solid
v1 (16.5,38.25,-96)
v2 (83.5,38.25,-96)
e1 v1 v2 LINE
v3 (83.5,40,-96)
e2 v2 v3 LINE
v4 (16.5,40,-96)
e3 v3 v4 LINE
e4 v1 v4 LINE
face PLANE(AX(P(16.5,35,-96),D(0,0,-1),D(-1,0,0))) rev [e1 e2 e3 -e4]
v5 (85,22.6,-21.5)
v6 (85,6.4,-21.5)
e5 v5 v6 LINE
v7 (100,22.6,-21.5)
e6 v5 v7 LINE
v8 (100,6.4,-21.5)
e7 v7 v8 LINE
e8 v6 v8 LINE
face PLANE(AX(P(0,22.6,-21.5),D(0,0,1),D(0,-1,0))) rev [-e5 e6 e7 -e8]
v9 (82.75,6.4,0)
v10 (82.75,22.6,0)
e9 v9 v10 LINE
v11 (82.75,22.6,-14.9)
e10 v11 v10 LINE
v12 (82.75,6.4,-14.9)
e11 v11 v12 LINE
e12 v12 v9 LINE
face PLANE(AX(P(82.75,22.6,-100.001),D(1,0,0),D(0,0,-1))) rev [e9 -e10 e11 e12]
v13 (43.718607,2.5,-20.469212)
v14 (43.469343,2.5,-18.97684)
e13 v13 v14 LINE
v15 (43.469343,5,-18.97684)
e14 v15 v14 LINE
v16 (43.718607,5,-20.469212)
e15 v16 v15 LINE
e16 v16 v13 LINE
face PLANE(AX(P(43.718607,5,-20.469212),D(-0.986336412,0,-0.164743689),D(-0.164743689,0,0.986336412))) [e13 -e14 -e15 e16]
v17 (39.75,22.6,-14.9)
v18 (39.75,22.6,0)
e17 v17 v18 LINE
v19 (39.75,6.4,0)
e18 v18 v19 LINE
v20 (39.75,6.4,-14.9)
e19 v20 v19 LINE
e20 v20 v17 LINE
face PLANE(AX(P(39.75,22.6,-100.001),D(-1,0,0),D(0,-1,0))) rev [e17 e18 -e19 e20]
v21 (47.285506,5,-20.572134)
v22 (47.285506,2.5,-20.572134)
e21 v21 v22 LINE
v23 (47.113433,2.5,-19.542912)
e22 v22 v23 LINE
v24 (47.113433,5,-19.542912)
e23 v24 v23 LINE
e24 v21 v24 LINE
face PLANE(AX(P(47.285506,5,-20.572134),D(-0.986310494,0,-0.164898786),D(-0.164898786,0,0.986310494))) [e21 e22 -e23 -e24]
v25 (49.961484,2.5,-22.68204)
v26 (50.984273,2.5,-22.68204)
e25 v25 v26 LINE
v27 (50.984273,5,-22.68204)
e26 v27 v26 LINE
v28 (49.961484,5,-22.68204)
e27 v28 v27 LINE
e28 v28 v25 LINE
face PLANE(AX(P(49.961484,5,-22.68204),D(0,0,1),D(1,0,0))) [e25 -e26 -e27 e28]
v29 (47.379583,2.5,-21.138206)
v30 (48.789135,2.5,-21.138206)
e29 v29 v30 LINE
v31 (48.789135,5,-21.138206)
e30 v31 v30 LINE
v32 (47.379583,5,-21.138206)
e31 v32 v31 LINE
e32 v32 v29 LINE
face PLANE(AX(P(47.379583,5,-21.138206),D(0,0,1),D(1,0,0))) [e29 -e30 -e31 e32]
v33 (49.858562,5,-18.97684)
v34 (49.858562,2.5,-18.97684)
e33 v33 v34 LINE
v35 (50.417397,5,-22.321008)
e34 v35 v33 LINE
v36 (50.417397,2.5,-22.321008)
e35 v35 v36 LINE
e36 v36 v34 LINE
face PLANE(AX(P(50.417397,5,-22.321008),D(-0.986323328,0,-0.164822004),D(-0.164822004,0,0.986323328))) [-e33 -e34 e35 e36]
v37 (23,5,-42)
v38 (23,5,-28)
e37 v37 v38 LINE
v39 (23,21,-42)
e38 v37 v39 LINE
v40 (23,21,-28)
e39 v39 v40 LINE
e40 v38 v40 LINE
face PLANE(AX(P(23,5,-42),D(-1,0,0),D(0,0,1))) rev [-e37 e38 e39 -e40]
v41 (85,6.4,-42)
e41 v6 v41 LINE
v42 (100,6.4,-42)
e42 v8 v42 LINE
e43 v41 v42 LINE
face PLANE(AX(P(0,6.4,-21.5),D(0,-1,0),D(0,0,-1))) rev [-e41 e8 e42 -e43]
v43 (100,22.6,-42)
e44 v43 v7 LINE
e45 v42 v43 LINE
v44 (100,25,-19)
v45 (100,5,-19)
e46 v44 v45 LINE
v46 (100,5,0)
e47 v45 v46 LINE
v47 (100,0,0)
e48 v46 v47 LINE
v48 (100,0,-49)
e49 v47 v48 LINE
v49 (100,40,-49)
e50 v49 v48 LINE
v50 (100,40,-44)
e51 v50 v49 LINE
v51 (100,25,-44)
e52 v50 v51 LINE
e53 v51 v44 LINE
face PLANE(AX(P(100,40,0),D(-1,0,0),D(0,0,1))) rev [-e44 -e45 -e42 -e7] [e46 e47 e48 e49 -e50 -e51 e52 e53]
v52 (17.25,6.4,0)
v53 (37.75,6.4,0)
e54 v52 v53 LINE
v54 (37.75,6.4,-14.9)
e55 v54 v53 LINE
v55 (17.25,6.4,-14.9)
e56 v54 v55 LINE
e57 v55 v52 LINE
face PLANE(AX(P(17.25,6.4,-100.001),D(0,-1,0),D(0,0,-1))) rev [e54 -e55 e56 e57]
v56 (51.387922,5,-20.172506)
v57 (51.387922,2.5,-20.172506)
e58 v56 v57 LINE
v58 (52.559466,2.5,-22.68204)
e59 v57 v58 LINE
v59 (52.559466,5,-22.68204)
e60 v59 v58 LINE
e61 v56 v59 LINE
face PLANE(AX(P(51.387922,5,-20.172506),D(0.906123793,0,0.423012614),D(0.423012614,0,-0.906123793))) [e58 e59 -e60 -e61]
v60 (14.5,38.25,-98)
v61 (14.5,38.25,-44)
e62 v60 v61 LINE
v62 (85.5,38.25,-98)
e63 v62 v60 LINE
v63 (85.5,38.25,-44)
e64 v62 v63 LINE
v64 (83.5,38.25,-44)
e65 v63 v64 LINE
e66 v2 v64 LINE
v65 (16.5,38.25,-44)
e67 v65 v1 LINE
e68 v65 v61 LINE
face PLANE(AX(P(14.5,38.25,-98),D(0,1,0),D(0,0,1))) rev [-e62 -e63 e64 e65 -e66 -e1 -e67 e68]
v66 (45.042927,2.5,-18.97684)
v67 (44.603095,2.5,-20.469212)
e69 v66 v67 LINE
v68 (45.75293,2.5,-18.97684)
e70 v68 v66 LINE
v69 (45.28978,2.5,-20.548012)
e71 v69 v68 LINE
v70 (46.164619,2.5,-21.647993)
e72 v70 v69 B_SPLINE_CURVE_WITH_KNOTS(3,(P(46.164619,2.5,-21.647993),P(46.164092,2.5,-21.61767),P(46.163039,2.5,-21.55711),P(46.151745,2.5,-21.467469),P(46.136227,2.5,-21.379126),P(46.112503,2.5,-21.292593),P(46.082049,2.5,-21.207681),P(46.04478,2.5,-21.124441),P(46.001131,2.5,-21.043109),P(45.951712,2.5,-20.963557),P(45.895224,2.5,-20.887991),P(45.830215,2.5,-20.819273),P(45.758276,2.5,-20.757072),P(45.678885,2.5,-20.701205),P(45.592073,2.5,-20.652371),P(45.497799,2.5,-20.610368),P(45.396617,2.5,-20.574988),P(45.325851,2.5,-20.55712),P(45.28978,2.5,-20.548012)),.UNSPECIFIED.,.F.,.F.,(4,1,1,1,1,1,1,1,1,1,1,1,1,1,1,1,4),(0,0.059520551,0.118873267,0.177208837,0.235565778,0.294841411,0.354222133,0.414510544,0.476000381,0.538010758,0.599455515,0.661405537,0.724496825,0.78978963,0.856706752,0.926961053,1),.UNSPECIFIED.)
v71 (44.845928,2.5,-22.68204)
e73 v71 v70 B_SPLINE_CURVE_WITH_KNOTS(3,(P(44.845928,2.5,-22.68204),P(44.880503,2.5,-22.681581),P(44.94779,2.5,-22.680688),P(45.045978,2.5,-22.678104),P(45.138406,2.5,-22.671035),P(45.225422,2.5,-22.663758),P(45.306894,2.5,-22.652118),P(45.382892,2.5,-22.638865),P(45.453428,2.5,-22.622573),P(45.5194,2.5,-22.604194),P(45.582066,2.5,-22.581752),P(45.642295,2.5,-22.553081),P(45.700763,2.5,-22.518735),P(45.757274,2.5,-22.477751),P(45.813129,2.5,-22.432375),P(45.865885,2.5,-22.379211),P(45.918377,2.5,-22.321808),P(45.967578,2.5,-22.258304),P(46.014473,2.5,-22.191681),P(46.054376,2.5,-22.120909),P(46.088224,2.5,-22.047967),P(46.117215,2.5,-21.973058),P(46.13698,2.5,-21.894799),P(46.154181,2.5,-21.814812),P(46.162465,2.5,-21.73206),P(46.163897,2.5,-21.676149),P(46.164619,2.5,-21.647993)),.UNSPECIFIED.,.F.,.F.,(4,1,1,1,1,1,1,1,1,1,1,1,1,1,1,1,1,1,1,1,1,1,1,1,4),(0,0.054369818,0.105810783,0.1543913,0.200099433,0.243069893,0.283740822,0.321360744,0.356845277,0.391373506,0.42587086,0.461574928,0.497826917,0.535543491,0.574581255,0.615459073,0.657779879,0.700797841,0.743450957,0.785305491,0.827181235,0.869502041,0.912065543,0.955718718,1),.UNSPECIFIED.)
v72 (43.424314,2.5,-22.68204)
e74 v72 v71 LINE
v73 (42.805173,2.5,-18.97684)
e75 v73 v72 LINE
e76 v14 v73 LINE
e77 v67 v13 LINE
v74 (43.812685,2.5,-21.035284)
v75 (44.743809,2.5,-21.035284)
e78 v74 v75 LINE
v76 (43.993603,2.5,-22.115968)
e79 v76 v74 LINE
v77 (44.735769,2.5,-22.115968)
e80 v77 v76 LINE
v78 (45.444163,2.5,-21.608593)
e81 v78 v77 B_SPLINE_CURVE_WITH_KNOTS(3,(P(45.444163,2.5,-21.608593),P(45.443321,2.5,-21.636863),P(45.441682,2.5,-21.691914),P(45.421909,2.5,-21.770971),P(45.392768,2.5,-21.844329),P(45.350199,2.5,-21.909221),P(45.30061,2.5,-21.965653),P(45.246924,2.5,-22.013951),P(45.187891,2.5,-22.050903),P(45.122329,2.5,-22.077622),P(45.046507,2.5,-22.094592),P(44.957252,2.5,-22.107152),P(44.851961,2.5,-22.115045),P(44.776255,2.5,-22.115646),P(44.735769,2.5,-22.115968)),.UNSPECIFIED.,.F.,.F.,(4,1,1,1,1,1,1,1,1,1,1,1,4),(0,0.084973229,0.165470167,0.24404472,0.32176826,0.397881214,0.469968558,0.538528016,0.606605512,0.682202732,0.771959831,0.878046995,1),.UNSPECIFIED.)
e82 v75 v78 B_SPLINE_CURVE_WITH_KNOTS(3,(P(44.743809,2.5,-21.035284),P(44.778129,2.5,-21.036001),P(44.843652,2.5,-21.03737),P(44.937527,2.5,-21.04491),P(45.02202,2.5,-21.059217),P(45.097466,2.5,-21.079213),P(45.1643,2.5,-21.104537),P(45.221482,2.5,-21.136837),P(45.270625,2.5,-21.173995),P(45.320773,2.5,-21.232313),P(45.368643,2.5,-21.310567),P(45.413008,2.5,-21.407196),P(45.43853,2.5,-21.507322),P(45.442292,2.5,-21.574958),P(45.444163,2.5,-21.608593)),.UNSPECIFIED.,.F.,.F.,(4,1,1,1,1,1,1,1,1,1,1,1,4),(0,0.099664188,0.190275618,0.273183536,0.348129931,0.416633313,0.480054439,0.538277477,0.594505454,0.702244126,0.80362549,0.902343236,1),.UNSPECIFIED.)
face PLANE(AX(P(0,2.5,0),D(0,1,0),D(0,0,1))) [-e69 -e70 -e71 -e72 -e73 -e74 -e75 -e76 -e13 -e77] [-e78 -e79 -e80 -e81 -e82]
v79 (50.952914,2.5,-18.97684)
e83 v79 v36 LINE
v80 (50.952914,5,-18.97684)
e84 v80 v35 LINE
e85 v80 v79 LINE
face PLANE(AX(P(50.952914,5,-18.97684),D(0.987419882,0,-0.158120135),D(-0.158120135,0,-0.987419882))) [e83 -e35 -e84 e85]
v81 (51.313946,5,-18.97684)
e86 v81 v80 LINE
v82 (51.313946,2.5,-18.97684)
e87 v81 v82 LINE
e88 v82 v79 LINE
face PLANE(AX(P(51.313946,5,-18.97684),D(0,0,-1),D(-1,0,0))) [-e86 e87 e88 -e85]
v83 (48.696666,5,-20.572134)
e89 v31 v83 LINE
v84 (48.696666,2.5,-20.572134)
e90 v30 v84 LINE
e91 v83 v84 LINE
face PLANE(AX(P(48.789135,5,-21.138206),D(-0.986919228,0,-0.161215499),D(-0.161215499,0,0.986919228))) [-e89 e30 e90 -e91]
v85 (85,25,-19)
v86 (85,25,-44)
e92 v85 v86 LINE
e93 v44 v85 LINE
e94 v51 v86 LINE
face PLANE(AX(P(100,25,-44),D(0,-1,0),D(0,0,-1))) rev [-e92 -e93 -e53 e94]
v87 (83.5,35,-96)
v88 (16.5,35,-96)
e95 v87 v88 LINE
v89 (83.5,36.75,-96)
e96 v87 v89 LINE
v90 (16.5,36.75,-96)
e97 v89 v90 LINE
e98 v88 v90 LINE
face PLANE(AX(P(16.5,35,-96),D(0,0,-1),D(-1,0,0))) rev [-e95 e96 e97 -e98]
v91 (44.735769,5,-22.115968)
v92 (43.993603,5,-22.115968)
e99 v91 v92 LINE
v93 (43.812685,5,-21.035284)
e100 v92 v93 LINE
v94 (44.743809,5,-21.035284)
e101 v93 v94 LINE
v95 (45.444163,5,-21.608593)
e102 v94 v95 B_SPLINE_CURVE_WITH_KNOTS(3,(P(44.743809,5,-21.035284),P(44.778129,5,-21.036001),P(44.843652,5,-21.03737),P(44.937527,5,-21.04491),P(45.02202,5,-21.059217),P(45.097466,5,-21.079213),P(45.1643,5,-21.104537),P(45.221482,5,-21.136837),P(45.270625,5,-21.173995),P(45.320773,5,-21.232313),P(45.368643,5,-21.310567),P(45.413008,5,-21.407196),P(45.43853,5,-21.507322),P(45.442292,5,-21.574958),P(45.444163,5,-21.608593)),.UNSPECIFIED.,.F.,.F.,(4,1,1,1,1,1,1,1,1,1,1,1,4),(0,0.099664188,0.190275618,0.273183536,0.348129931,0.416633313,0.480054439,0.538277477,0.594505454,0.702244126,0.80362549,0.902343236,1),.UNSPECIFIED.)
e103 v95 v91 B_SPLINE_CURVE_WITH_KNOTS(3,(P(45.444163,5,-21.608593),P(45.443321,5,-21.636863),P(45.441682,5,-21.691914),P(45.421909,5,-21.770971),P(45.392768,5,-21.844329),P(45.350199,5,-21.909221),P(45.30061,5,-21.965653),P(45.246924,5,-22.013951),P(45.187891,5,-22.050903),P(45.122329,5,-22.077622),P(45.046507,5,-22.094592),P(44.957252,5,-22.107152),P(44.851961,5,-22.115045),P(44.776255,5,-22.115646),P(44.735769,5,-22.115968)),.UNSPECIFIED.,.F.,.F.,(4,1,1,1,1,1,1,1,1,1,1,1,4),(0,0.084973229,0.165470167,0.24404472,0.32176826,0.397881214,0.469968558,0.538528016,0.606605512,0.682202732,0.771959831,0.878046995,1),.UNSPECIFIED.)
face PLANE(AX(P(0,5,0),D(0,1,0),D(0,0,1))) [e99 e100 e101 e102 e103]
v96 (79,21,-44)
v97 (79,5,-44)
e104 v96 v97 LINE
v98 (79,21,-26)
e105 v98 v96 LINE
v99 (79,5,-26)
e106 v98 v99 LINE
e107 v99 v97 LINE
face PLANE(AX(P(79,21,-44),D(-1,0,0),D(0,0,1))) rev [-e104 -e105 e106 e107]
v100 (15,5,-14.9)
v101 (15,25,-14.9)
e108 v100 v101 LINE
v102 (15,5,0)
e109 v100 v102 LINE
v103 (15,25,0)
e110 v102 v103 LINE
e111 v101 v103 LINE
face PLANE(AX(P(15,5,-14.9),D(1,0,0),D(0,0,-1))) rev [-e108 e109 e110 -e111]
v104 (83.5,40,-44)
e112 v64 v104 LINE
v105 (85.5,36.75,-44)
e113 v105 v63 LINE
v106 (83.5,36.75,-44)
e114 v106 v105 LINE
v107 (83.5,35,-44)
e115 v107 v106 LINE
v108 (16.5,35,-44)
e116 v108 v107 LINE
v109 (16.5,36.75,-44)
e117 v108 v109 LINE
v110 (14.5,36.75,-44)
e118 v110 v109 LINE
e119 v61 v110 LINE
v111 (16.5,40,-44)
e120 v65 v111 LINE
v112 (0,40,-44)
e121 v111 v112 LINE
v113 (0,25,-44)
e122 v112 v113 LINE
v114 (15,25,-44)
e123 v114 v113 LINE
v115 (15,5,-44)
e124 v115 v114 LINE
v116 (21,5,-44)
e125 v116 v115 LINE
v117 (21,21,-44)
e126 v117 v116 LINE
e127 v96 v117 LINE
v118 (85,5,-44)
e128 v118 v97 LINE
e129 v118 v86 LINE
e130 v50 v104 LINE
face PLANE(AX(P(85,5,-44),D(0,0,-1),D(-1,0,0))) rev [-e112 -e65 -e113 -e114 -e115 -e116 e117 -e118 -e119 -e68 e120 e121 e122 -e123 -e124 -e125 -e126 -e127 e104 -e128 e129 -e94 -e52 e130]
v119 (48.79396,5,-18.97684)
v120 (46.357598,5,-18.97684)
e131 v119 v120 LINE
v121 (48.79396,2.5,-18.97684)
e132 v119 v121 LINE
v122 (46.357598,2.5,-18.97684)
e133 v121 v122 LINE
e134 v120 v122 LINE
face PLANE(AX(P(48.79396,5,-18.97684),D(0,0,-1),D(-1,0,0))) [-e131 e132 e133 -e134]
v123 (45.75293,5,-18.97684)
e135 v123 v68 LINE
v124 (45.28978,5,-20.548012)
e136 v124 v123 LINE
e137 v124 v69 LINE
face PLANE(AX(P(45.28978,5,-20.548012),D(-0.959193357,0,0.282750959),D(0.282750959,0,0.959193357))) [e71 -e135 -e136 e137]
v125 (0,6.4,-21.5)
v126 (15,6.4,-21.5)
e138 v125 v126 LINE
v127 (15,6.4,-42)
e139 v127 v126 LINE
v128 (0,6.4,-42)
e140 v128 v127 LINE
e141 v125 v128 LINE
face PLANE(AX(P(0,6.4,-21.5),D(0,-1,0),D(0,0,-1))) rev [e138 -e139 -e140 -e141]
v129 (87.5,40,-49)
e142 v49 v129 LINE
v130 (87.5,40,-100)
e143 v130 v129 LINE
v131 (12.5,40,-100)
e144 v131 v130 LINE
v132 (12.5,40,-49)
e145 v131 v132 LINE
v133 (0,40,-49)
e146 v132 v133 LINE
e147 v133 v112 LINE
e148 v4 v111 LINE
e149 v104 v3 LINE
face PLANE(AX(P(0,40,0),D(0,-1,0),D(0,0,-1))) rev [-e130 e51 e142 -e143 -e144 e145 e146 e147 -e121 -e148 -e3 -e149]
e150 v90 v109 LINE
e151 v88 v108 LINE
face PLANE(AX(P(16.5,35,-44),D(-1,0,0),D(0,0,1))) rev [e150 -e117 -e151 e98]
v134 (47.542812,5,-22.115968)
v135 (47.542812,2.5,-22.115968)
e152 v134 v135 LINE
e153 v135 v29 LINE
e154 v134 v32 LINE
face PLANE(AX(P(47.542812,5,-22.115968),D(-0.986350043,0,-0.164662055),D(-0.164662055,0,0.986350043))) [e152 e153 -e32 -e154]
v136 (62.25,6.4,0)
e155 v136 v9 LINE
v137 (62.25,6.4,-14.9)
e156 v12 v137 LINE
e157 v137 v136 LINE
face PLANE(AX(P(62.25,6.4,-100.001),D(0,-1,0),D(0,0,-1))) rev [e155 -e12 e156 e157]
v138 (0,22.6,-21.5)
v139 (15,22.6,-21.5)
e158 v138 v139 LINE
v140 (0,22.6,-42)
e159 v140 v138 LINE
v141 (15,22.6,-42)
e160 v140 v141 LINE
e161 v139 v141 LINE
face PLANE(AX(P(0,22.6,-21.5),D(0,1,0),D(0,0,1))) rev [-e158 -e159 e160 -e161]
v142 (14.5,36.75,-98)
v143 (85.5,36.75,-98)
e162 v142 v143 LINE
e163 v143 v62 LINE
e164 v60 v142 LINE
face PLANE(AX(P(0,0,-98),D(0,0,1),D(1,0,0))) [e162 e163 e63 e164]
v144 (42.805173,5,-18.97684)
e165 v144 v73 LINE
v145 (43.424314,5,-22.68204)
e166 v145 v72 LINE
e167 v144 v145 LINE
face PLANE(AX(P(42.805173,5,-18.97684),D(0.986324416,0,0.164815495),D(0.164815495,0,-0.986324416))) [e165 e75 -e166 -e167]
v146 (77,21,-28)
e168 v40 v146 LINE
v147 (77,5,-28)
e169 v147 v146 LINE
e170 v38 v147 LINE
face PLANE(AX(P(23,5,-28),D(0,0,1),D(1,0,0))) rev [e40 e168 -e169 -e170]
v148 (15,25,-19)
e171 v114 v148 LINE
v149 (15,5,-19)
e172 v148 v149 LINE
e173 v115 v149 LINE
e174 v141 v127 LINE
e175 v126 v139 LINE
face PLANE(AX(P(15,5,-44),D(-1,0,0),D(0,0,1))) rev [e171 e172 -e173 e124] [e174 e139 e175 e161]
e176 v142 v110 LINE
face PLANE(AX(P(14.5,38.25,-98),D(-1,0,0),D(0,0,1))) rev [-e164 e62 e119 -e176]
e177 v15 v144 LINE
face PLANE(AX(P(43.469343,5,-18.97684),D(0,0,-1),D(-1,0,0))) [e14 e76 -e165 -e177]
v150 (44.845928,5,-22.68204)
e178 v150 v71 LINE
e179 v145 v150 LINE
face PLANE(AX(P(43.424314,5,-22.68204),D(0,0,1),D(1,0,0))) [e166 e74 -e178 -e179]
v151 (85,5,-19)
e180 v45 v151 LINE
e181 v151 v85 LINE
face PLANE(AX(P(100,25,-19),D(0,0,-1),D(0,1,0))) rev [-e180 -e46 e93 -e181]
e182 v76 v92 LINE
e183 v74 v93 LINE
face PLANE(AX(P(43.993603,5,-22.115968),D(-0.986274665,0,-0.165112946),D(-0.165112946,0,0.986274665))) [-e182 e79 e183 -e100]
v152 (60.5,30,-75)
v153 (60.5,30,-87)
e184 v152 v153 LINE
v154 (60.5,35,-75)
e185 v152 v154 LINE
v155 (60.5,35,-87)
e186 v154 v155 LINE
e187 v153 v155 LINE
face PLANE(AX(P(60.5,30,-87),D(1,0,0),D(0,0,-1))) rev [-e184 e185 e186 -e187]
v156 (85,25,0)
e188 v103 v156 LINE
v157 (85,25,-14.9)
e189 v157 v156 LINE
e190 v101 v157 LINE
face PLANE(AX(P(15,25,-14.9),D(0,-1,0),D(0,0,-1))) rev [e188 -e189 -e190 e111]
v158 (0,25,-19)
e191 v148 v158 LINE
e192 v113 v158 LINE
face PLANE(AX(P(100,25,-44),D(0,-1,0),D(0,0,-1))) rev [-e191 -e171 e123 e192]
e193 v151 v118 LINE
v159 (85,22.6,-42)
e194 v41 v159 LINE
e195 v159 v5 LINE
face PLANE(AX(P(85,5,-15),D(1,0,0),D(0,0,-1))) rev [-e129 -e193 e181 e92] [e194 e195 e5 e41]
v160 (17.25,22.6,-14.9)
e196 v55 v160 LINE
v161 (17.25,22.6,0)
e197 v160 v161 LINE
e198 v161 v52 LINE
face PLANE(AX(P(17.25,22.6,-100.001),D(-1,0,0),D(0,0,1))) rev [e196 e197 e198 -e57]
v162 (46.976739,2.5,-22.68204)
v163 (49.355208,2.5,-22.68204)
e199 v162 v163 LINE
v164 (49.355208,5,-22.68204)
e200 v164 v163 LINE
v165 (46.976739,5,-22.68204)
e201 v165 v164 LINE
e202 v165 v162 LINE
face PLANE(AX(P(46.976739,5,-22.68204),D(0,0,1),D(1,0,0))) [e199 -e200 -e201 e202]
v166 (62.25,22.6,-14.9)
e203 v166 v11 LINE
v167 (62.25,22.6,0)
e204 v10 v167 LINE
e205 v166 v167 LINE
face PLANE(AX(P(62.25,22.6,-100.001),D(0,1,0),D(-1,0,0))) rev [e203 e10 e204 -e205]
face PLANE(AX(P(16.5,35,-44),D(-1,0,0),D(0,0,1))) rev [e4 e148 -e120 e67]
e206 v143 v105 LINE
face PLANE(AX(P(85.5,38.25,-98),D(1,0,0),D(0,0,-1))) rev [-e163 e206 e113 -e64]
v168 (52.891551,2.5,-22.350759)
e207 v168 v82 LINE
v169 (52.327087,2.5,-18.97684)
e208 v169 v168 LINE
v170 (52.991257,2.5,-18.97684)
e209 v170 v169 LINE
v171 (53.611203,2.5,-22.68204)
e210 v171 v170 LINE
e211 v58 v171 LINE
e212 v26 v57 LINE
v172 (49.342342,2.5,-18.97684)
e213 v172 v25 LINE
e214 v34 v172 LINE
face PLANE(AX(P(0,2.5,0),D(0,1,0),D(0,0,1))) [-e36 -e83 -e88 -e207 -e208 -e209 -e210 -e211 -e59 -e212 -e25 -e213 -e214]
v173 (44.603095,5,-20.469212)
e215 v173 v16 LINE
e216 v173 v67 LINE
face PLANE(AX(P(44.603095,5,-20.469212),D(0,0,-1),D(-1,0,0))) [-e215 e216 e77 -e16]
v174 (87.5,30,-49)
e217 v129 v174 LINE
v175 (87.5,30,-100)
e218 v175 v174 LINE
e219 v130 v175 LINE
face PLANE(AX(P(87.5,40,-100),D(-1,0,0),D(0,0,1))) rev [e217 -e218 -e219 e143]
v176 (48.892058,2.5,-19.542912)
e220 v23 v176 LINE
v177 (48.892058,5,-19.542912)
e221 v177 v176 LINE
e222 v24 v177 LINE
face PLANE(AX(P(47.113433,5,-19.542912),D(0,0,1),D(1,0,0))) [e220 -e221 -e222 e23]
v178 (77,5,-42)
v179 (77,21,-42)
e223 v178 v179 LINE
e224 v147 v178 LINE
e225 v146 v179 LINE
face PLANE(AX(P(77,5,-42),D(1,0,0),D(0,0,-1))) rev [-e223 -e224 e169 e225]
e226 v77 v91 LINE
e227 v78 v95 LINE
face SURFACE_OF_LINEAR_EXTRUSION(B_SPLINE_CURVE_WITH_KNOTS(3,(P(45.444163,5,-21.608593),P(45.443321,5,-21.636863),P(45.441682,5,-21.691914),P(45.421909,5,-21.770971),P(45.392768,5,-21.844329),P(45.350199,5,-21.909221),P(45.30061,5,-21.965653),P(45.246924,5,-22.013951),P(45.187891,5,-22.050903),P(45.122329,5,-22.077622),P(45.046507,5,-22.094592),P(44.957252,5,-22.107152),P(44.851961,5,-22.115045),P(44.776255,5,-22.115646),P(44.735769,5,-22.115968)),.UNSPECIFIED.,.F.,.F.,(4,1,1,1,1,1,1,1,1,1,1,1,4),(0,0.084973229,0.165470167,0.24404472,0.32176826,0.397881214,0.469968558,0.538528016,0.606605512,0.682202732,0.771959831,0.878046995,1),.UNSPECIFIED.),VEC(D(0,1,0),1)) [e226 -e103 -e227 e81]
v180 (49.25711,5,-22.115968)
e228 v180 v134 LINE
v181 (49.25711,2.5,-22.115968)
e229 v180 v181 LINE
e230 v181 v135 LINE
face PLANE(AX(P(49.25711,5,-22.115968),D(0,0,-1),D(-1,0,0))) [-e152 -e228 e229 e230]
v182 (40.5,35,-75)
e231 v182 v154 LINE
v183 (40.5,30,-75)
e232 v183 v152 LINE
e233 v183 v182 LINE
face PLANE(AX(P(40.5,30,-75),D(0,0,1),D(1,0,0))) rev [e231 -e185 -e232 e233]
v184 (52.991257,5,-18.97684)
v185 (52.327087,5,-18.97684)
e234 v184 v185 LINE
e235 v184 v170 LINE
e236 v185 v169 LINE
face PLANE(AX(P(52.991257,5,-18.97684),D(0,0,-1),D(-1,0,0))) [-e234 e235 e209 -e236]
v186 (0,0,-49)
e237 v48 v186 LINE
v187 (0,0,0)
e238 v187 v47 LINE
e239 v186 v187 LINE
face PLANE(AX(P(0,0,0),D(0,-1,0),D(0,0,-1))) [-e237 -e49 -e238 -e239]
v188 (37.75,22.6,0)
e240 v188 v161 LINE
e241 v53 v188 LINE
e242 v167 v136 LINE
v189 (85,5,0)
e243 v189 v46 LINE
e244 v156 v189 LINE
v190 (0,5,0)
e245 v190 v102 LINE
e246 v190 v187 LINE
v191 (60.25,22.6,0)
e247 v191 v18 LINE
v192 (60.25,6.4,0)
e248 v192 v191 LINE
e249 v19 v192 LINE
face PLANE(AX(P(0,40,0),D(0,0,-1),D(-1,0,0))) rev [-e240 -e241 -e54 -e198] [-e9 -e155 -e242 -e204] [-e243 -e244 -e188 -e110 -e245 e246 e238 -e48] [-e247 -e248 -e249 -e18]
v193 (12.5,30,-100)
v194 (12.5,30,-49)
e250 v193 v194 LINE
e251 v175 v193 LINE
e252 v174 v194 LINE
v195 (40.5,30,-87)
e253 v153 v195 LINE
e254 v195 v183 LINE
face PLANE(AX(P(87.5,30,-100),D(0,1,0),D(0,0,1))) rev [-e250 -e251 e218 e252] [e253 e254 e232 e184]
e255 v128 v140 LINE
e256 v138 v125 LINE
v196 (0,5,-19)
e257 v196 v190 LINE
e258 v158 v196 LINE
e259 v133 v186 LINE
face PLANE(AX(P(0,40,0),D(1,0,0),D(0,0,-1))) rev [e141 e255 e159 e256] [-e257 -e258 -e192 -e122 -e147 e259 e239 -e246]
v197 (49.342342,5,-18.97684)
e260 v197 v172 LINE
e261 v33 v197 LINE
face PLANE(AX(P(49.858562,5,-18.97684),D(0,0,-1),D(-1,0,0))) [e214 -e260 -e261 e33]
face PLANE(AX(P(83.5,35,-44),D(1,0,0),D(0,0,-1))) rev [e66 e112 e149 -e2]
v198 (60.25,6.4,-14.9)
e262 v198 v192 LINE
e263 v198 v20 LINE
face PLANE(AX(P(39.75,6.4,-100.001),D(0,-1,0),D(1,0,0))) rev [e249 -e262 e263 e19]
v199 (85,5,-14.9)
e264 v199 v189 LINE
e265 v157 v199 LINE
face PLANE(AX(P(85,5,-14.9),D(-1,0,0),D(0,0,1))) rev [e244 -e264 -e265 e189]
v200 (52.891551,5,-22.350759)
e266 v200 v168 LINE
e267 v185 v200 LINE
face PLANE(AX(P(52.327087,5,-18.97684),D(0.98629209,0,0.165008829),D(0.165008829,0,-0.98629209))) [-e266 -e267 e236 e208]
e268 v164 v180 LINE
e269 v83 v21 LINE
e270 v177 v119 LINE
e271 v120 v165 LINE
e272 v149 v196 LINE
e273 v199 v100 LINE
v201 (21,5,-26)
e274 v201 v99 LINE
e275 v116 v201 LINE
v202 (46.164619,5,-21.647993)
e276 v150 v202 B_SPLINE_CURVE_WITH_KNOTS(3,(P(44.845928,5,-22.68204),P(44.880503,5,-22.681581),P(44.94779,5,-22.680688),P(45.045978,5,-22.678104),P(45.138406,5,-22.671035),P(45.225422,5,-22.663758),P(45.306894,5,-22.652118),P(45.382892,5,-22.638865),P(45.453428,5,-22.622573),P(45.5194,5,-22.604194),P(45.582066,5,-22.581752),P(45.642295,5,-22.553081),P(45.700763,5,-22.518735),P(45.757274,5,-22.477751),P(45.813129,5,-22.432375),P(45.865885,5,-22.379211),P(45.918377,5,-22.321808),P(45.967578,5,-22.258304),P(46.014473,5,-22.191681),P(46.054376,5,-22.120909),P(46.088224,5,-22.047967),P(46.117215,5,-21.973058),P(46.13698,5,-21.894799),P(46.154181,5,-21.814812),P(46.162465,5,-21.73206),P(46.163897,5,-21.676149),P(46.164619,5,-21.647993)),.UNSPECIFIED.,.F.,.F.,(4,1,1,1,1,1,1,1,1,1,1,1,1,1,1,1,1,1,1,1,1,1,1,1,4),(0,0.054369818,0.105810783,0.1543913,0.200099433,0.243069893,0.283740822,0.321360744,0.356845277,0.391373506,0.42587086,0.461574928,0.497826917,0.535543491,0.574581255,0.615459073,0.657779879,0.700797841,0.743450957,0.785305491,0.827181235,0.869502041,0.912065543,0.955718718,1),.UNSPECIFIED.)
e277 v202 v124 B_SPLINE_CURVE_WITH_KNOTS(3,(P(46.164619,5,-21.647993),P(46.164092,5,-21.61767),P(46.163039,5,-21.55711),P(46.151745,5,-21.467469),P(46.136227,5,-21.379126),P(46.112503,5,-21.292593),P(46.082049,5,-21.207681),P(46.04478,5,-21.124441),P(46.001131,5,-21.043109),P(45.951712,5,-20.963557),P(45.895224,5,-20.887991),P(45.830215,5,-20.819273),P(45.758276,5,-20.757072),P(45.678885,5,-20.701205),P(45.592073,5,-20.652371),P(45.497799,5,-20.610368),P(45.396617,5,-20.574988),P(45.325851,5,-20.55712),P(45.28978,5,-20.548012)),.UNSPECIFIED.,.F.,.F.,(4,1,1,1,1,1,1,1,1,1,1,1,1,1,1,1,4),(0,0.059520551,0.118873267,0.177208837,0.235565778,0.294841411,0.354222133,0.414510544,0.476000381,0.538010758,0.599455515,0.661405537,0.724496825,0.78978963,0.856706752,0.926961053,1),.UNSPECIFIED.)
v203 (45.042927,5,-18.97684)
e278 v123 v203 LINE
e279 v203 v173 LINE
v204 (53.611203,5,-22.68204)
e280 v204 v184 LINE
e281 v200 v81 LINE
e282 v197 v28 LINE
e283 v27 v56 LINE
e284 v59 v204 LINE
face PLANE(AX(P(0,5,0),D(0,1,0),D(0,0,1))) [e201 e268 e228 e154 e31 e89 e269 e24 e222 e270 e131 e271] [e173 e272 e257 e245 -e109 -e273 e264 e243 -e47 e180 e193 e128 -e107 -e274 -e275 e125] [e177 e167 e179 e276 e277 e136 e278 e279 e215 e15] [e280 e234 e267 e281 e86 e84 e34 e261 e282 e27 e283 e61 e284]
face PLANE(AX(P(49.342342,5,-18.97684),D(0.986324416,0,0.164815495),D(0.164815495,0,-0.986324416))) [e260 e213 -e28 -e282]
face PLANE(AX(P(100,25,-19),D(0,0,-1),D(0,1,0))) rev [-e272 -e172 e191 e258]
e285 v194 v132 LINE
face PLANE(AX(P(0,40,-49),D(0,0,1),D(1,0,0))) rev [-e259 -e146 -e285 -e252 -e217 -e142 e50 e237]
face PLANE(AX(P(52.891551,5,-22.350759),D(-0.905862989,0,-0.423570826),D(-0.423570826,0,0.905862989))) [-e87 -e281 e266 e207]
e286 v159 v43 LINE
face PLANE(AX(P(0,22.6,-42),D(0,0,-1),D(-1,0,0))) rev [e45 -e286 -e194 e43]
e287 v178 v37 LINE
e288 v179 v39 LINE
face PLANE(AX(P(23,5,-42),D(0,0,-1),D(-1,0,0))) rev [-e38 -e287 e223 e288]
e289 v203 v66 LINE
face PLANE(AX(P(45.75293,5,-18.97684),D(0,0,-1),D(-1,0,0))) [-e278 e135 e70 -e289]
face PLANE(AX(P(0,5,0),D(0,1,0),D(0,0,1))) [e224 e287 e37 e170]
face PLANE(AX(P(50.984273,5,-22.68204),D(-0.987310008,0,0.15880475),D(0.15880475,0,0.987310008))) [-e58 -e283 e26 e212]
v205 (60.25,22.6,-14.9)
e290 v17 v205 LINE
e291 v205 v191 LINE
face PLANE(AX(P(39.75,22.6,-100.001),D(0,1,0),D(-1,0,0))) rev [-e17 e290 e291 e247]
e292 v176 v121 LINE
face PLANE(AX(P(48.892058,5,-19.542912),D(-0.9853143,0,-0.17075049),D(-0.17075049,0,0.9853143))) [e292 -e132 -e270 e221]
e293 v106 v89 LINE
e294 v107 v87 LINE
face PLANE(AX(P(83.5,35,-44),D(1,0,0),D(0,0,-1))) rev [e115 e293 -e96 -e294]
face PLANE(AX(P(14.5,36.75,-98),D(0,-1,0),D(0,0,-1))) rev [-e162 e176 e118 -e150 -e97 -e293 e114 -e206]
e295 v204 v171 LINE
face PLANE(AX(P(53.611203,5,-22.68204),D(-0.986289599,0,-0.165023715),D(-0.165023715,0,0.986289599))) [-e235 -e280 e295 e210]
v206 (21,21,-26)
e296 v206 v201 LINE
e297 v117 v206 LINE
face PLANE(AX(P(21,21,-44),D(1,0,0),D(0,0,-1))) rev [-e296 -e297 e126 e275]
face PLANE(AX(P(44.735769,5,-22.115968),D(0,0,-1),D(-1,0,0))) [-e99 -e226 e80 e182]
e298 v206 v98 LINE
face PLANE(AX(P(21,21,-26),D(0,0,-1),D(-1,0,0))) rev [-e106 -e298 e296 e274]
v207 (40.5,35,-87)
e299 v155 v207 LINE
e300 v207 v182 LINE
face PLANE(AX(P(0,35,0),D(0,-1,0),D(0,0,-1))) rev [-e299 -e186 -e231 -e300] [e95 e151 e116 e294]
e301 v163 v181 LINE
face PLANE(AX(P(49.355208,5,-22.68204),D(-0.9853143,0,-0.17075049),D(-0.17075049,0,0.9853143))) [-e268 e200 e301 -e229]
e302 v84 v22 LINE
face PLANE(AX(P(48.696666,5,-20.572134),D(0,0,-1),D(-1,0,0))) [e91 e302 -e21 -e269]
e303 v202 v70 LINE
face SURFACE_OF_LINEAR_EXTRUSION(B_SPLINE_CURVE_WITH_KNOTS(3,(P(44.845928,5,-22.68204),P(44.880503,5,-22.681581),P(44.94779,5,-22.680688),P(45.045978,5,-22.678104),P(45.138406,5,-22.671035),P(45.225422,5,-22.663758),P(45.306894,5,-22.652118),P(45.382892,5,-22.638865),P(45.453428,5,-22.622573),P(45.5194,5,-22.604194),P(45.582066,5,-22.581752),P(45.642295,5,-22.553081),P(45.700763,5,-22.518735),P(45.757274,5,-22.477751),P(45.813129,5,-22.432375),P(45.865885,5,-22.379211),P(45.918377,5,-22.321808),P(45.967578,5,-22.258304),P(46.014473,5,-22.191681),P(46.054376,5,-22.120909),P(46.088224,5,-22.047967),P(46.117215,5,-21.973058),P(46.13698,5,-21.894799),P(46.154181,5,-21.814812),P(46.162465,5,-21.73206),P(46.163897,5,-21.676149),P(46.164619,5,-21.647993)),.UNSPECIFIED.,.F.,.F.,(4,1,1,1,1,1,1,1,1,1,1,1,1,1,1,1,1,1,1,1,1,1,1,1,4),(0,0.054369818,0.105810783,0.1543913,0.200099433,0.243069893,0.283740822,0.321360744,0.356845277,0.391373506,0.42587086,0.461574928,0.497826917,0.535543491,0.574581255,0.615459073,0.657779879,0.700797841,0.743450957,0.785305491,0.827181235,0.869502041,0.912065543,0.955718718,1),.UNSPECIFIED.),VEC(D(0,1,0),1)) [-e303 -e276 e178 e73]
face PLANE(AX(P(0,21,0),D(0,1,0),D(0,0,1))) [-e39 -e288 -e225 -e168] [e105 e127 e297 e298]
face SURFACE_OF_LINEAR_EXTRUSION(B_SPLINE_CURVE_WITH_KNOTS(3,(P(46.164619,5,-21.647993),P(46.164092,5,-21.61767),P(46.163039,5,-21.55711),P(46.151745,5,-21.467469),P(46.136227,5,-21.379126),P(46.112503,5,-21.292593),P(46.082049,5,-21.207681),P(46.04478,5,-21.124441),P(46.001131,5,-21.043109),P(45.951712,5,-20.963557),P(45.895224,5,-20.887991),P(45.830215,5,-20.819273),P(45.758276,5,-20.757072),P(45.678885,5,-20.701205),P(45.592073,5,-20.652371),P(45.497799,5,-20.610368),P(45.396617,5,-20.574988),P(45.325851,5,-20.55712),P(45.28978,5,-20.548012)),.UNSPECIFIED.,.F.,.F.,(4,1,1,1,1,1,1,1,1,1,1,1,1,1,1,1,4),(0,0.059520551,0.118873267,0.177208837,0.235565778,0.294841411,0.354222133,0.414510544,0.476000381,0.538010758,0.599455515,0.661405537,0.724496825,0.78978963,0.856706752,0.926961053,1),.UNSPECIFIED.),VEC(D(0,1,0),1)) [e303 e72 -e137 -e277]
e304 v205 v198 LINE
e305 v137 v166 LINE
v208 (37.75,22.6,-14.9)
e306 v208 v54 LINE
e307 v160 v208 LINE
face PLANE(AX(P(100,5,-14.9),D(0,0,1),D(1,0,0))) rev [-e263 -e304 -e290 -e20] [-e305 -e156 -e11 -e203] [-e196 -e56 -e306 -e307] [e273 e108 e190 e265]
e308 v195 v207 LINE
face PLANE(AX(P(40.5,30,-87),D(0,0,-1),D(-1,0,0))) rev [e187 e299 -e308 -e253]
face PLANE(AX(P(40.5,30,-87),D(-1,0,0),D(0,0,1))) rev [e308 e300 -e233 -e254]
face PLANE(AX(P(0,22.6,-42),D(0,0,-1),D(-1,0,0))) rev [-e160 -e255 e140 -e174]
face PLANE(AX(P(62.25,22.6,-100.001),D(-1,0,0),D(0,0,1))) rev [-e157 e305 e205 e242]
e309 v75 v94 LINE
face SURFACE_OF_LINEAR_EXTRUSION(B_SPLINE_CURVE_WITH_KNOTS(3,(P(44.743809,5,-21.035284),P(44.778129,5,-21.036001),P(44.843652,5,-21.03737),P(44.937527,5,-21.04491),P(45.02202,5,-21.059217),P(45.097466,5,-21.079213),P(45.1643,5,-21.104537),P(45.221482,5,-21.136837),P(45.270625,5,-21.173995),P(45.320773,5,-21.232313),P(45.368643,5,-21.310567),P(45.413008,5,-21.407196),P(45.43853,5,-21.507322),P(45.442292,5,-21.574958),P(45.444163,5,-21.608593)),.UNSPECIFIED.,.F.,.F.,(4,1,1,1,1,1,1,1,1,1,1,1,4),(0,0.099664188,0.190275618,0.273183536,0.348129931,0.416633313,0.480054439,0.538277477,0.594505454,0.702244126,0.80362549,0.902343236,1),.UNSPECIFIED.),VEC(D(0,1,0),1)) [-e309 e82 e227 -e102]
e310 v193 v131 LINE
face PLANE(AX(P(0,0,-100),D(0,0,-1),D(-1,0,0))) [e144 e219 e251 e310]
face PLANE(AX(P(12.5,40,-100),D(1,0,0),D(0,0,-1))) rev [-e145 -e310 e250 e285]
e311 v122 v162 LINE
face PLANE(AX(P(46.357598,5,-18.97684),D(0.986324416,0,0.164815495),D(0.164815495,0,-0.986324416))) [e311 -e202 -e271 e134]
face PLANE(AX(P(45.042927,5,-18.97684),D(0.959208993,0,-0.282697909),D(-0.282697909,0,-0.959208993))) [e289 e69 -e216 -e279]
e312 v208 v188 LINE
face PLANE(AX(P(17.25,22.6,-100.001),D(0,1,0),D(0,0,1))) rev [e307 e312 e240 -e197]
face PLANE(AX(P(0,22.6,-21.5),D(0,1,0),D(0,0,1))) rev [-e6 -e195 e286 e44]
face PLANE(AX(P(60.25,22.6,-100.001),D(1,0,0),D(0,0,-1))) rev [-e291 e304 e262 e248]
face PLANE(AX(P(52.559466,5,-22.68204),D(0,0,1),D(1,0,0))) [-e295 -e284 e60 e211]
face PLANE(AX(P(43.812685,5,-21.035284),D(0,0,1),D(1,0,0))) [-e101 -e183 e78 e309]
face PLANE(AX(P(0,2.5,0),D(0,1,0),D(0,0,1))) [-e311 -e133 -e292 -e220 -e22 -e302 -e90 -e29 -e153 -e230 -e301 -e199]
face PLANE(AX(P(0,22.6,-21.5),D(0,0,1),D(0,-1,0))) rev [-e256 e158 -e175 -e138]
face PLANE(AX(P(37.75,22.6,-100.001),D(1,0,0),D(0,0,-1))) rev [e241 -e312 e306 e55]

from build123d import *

# Parameters (mm, degrees)
CROQUIS1_W              = 100
CROQUIS1_H              = 49
SALIENTE_EXTRUIR1_DEPTH = 40
CROQUIS2_W              = 70
CROQUIS2_H              = 29
CORTAR_EXTRUIR1_DEPTH   = 35
CORTAR_EXTRUIR2_DEPTH   = 14.9
CORTAR_EXTRUIR4_DEPTH   = 119.325821358
CROQUIS6_W              = 20.5
CROQUIS6_H              = 16.2
CORTAR_EXTRUIR6_DEPTH   = 119.325821358
CROQUIS7_W              = 58
CROQUIS7_H              = 18
SALIENTE_EXTRUIR2_DEPTH = 16
CROQUIS8_W              = 54
CROQUIS8_H              = 14
CORTAR_EXTRUIR7_DEPTH   = 16
ENVOLVER2_START         = -2.5
ENVOLVER2_DEPTH         = 2.5
CROQUIS11_W             = 75
CROQUIS11_H             = 10
SALIENTE_EXTRUIR3_DEPTH = 51
CROQUIS12_W             = 67
CROQUIS12_H             = 52
CORTAR_EXTRUIR8_DEPTH   = 5
CROQUIS13_W             = 71
CROQUIS13_H             = 1.5
CORTAR_EXTRUIR9_DEPTH   = 54
CROQUIS14_W             = 20
CROQUIS14_H             = 12
CORTAR_EXTRUIR10_DEPTH  = 5
CORTAR_EXTRUIR11_REACH  = 148.969
CROQUIS5_W              = 20.5
CROQUIS5_H              = 16.2


# Read off the part's stored shape, not the designer's step: Envolver2
with BuildPart() as part:
    # Croquis1 → Saliente-Extruir1 (new body)
    with BuildSketch(Plane(origin=(0, 0, 0), x_dir=(1, 0, 0), z_dir=(0, 1, 0))):
        with Locations((50, 24.5)):
            Rectangle(CROQUIS1_W, CROQUIS1_H)
    extrude(amount=SALIENTE_EXTRUIR1_DEPTH)

    # Croquis2 → Cortar-Extruir1 (cut)
    with BuildSketch(Plane(origin=(0, 40, 0), x_dir=(1, 0, 0), z_dir=(0, 1, 0))):
        with Locations((50, 29.5)):
            Rectangle(CROQUIS2_W, CROQUIS2_H)
    extrude(amount=-CORTAR_EXTRUIR1_DEPTH, mode=Mode.SUBTRACT)

    # Croquis3 → Cortar-Extruir2 (cut)
    with BuildSketch(Plane.XY):
        Polygon((15, 5), (15, 25), (85, 25), (85, 5), (100, 5), (100, 40), (0, 40), (0, 5), align=None)
    extrude(amount=-CORTAR_EXTRUIR2_DEPTH, mode=Mode.SUBTRACT)

    # Croquis4 → Cortar-Extruir4 (cut, through all)
    with BuildSketch(Plane.ZY):
        Polygon((-44, 25), (-19, 25), (-19, 5), (-14.9, 5), (-14.9, 40), (-44, 40), align=None)
    extrude(amount=-CORTAR_EXTRUIR4_DEPTH, mode=Mode.SUBTRACT)

    # Croquis6 → Cortar-Extruir6 (cut, through all)
    with BuildSketch(Plane(origin=(100, 0, 0), x_dir=(0, 0, -1), z_dir=(1, 0, 0))):
        with Locations((31.75, 14.5)):
            Rectangle(CROQUIS6_W, CROQUIS6_H)
    extrude(amount=-CORTAR_EXTRUIR6_DEPTH, mode=Mode.SUBTRACT)

    # Croquis7 → Saliente-Extruir2 (add)
    with BuildSketch(Plane(origin=(0, 5, 0), x_dir=(1, 0, 0), z_dir=(0, 1, 0))):
        with Locations((50, 35)):
            Rectangle(CROQUIS7_W, CROQUIS7_H)
    extrude(amount=SALIENTE_EXTRUIR2_DEPTH)

    # Croquis8 → Cortar-Extruir7 (cut)
    with BuildSketch(Plane(origin=(0, 21, 0), x_dir=(1, 0, 0), z_dir=(0, 1, 0))):
        with Locations((50, 35)):
            Rectangle(CROQUIS8_W, CROQUIS8_H)
    extrude(amount=-CORTAR_EXTRUIR7_DEPTH, mode=Mode.SUBTRACT)

    # Envolver2 outline → Envolver2 (cut)
    # profile 1 of 3: a face of its own
    with BuildSketch(Plane(origin=(0, 5, 0), x_dir=(1, 0, 0), z_dir=(0, 1, 0)).offset(ENVOLVER2_START)):
        with BuildLine():
            add(Edge.make_bspline(
                [(44.845927513, 22.682039813), (44.880502524, 22.681581101), (44.94779002, 22.680688388), (45.045978034, 22.678103561), (45.138406194, 22.671034857), (45.225422346, 22.663758255), (45.306894242, 22.652117669), (45.382891805, 22.638865253), (45.453428219, 22.622573117), (45.519399834, 22.604194379), (45.582065701, 22.58175166), (45.642294727, 22.553081251), (45.700763218, 22.518735345), (45.757273689, 22.477750733), (45.813128977, 22.432374893), (45.865885411, 22.37921084), (45.918377238, 22.321807714), (45.967578278, 22.25830401), (46.01447324, 22.191680732), (46.054376208, 22.120908747), (46.088223994, 22.047966819), (46.117214563, 21.973058038), (46.136979973, 21.894799291), (46.154181469, 21.814812457), (46.162464556, 21.732060085), (46.163897144, 21.676148523), (46.164618555, 21.647993057)],
                knots=[0, 0, 0, 0, 0.054369818, 0.105810783, 0.1543913, 0.200099433, 0.243069893, 0.283740822, 0.321360744, 0.356845277, 0.391373506, 0.42587086, 0.461574928, 0.497826917, 0.535543491, 0.574581255, 0.615459073, 0.657779879, 0.700797841, 0.743450957, 0.785305491, 0.827181235, 0.869502041, 0.912065543, 0.955718718, 1, 1, 1, 1], degree=3))
            Line((44.845927513, 22.682039813), (43.424314244, 22.682039813))
            Line((43.424314244, 22.682039813), (42.805172718, 18.976839617))
            Line((42.805172718, 18.976839617), (43.469342719, 18.976839617))
            Line((43.469342719, 18.976839617), (43.718607489, 20.469211918))
            Line((43.718607489, 20.469211918), (44.603095383, 20.469211918))
            Line((44.603095383, 20.469211918), (45.04292709, 18.976839617))
            Line((45.04292709, 18.976839617), (45.752929645, 18.976839617))
            Line((45.752929645, 18.976839617), (45.28977962, 20.548011749))
            add(Edge.make_bspline(
                [(46.164618555, 21.647993057), (46.164091676, 21.617670303), (46.163039403, 21.5571103), (46.151744736, 21.467468845), (46.13622668, 21.379126232), (46.112503265, 21.292592771), (46.082048693, 21.207680933), (46.044780457, 21.124441143), (46.001130757, 21.043108672), (45.951712013, 20.9635574), (45.895224481, 20.887990565), (45.830214645, 20.819272615), (45.758276279, 20.757071565), (45.678885267, 20.701205138), (45.592072867, 20.652370985), (45.497799172, 20.610367641), (45.396617343, 20.574987864), (45.325850603, 20.557119534), (45.28977962, 20.548011749)],
                knots=[0, 0, 0, 0, 0.059520551, 0.118873267, 0.177208837, 0.235565778, 0.294841411, 0.354222133, 0.414510544, 0.476000381, 0.538010758, 0.599455515, 0.661405537, 0.724496825, 0.78978963, 0.856706752, 0.926961053, 1, 1, 1, 1], degree=3))
        make_face()
        with BuildLine():
            add(Edge.make_bspline(
                [(44.743809366, 21.03528417), (44.778129381, 21.03600119), (44.843652036, 21.0373701), (44.937526666, 21.044910102), (45.022020151, 21.059216882), (45.097465695, 21.079213334), (45.164300411, 21.104537257), (45.221481868, 21.136836672), (45.270624581, 21.17399479), (45.32077283, 21.232312946), (45.36864261, 21.310567266), (45.413007527, 21.407196099), (45.438530205, 21.507321555), (45.442292151, 21.574957755), (45.444162962, 21.608593141)],
                knots=[0, 0, 0, 0, 0.099664188, 0.190275618, 0.273183536, 0.348129931, 0.416633313, 0.480054439, 0.538277477, 0.594505454, 0.702244126, 0.80362549, 0.902343236, 1, 1, 1, 1], degree=3))
            Line((44.743809366, 21.03528417), (43.812684837, 21.03528417))
            Line((43.812684837, 21.03528417), (43.993602816, 22.115967561))
            Line((43.993602816, 22.115967561), (44.735768567, 22.115967561))
            add(Edge.make_bspline(
                [(45.444162962, 21.608593141), (45.443321191, 21.636863214), (45.441681994, 21.691914124), (45.421908744, 21.770970842), (45.392768442, 21.844328967), (45.35019923, 21.909220717), (45.300609579, 21.965653441), (45.246923641, 22.013950522), (45.187891151, 22.050903022), (45.122329195, 22.077622199), (45.046506806, 22.09459194), (44.957252302, 22.107151834), (44.85196106, 22.115045121), (44.776255138, 22.115646142), (44.735768567, 22.115967561)],
                knots=[0, 0, 0, 0, 0.084973229, 0.165470167, 0.24404472, 0.32176826, 0.397881214, 0.469968558, 0.538528016, 0.606605512, 0.682202732, 0.771959831, 0.878046995, 1, 1, 1, 1], degree=3))
        make_face(mode=Mode.SUBTRACT)
    # profile 2 of 3: a face of its own
    with BuildSketch(Plane(origin=(0, 5, 0), x_dir=(1, 0, 0), z_dir=(0, 1, 0)).offset(ENVOLVER2_START)):
        Polygon((46.976739258, 22.682039813), (46.357597732, 18.976839617), (48.79395984, 18.976839617), (48.892057588, 19.542911869), (47.113432841, 19.542911869), (47.285505941, 20.572134146), (48.696666171, 20.572134146), (48.78913536, 21.138206398), (47.379583289, 21.138206398), (47.54281151, 22.115967561), (49.257109864, 22.115967561), (49.355207612, 22.682039813), align=None)
    # profile 3 of 3: a face of its own
    with BuildSketch(Plane(origin=(0, 5, 0), x_dir=(1, 0, 0), z_dir=(0, 1, 0)).offset(ENVOLVER2_START)):
        Polygon((50.984273497, 22.682039813), (49.96148386, 22.682039813), (49.342342334, 18.976839617), (49.858561632, 18.976839617), (50.417397165, 22.321007936), (50.952914381, 18.976839617), (51.313946257, 18.976839617), (52.891551028, 22.350758892), (52.327086936, 18.976839617), (52.991256936, 18.976839617), (53.611202541, 22.682039813), (52.559466028, 22.682039813), (51.387921608, 20.172506434), align=None)
    extrude(amount=ENVOLVER2_DEPTH, mode=Mode.SUBTRACT)

    # Croquis11 → Saliente-Extruir3 (add)
    with BuildSketch(Plane(origin=(0, 0, -49), x_dir=(-1, 0, 0), z_dir=(0, 0, -1))):
        with Locations((-50, 35)):
            Rectangle(CROQUIS11_W, CROQUIS11_H)
    extrude(amount=SALIENTE_EXTRUIR3_DEPTH)

    # Croquis12 → Cortar-Extruir8 (cut)
    with BuildSketch(Plane(origin=(0, 40, 0), x_dir=(1, 0, 0), z_dir=(0, 1, 0))):
        with Locations((50, 70)):
            Rectangle(CROQUIS12_W, CROQUIS12_H)
    extrude(amount=-CORTAR_EXTRUIR8_DEPTH, mode=Mode.SUBTRACT)

    # Croquis13 → Cortar-Extruir9 (cut)
    with BuildSketch(Plane.XY.offset(-44)):
        with Locations((50, 37.5)):
            Rectangle(CROQUIS13_W, CROQUIS13_H)
    extrude(amount=-CORTAR_EXTRUIR9_DEPTH, mode=Mode.SUBTRACT)

    # Croquis14 → Cortar-Extruir10 (cut)
    with BuildSketch(Plane(origin=(0, 35, 0), x_dir=(1, 0, 0), z_dir=(0, 1, 0))):
        with Locations((50.5, 81)):
            Rectangle(CROQUIS14_W, CROQUIS14_H)
    extrude(amount=-CORTAR_EXTRUIR10_DEPTH, mode=Mode.SUBTRACT)

    # Croquis5 → Cortar-Extruir11 (cut, up to next)
    with BuildSketch(Plane.XY, mode=Mode.PRIVATE) as cortar_extruir11_sk1:
        with Locations((27.5, 14.5)):
            Rectangle(CROQUIS5_W, CROQUIS5_H)
    cortar_extruir11_tool1 = extrude(cortar_extruir11_sk1.sketch, amount=-CORTAR_EXTRUIR11_REACH, mode=Mode.PRIVATE) & part.part
    # Croquis5 → Cortar-Extruir11 (cut, up to next)
    with BuildSketch(Plane.XY, mode=Mode.PRIVATE) as cortar_extruir11_sk2:
        with Locations((50, 14.5)):
            Rectangle(CROQUIS5_W, CROQUIS5_H)
    cortar_extruir11_tool2 = extrude(cortar_extruir11_sk2.sketch, amount=-CORTAR_EXTRUIR11_REACH, mode=Mode.PRIVATE) & part.part
    # Croquis5 → Cortar-Extruir11 (cut, up to next)
    with BuildSketch(Plane.XY, mode=Mode.PRIVATE) as cortar_extruir11_sk3:
        with Locations((72.5, 14.5)):
            Rectangle(CROQUIS5_W, CROQUIS5_H)
    cortar_extruir11_tool3 = extrude(cortar_extruir11_sk3.sketch, amount=-CORTAR_EXTRUIR11_REACH, mode=Mode.PRIVATE) & part.part
    add(cortar_extruir11_tool1.solids().sort_by_distance((27.5, 14.5, 0))[0], mode=Mode.SUBTRACT)
    add(cortar_extruir11_tool2.solids().sort_by_distance((50, 14.5, 0))[0], mode=Mode.SUBTRACT)
    add(cortar_extruir11_tool3.solids().sort_by_distance((72.5, 14.5, 0))[0], mode=Mode.SUBTRACT)


solid = part.part
